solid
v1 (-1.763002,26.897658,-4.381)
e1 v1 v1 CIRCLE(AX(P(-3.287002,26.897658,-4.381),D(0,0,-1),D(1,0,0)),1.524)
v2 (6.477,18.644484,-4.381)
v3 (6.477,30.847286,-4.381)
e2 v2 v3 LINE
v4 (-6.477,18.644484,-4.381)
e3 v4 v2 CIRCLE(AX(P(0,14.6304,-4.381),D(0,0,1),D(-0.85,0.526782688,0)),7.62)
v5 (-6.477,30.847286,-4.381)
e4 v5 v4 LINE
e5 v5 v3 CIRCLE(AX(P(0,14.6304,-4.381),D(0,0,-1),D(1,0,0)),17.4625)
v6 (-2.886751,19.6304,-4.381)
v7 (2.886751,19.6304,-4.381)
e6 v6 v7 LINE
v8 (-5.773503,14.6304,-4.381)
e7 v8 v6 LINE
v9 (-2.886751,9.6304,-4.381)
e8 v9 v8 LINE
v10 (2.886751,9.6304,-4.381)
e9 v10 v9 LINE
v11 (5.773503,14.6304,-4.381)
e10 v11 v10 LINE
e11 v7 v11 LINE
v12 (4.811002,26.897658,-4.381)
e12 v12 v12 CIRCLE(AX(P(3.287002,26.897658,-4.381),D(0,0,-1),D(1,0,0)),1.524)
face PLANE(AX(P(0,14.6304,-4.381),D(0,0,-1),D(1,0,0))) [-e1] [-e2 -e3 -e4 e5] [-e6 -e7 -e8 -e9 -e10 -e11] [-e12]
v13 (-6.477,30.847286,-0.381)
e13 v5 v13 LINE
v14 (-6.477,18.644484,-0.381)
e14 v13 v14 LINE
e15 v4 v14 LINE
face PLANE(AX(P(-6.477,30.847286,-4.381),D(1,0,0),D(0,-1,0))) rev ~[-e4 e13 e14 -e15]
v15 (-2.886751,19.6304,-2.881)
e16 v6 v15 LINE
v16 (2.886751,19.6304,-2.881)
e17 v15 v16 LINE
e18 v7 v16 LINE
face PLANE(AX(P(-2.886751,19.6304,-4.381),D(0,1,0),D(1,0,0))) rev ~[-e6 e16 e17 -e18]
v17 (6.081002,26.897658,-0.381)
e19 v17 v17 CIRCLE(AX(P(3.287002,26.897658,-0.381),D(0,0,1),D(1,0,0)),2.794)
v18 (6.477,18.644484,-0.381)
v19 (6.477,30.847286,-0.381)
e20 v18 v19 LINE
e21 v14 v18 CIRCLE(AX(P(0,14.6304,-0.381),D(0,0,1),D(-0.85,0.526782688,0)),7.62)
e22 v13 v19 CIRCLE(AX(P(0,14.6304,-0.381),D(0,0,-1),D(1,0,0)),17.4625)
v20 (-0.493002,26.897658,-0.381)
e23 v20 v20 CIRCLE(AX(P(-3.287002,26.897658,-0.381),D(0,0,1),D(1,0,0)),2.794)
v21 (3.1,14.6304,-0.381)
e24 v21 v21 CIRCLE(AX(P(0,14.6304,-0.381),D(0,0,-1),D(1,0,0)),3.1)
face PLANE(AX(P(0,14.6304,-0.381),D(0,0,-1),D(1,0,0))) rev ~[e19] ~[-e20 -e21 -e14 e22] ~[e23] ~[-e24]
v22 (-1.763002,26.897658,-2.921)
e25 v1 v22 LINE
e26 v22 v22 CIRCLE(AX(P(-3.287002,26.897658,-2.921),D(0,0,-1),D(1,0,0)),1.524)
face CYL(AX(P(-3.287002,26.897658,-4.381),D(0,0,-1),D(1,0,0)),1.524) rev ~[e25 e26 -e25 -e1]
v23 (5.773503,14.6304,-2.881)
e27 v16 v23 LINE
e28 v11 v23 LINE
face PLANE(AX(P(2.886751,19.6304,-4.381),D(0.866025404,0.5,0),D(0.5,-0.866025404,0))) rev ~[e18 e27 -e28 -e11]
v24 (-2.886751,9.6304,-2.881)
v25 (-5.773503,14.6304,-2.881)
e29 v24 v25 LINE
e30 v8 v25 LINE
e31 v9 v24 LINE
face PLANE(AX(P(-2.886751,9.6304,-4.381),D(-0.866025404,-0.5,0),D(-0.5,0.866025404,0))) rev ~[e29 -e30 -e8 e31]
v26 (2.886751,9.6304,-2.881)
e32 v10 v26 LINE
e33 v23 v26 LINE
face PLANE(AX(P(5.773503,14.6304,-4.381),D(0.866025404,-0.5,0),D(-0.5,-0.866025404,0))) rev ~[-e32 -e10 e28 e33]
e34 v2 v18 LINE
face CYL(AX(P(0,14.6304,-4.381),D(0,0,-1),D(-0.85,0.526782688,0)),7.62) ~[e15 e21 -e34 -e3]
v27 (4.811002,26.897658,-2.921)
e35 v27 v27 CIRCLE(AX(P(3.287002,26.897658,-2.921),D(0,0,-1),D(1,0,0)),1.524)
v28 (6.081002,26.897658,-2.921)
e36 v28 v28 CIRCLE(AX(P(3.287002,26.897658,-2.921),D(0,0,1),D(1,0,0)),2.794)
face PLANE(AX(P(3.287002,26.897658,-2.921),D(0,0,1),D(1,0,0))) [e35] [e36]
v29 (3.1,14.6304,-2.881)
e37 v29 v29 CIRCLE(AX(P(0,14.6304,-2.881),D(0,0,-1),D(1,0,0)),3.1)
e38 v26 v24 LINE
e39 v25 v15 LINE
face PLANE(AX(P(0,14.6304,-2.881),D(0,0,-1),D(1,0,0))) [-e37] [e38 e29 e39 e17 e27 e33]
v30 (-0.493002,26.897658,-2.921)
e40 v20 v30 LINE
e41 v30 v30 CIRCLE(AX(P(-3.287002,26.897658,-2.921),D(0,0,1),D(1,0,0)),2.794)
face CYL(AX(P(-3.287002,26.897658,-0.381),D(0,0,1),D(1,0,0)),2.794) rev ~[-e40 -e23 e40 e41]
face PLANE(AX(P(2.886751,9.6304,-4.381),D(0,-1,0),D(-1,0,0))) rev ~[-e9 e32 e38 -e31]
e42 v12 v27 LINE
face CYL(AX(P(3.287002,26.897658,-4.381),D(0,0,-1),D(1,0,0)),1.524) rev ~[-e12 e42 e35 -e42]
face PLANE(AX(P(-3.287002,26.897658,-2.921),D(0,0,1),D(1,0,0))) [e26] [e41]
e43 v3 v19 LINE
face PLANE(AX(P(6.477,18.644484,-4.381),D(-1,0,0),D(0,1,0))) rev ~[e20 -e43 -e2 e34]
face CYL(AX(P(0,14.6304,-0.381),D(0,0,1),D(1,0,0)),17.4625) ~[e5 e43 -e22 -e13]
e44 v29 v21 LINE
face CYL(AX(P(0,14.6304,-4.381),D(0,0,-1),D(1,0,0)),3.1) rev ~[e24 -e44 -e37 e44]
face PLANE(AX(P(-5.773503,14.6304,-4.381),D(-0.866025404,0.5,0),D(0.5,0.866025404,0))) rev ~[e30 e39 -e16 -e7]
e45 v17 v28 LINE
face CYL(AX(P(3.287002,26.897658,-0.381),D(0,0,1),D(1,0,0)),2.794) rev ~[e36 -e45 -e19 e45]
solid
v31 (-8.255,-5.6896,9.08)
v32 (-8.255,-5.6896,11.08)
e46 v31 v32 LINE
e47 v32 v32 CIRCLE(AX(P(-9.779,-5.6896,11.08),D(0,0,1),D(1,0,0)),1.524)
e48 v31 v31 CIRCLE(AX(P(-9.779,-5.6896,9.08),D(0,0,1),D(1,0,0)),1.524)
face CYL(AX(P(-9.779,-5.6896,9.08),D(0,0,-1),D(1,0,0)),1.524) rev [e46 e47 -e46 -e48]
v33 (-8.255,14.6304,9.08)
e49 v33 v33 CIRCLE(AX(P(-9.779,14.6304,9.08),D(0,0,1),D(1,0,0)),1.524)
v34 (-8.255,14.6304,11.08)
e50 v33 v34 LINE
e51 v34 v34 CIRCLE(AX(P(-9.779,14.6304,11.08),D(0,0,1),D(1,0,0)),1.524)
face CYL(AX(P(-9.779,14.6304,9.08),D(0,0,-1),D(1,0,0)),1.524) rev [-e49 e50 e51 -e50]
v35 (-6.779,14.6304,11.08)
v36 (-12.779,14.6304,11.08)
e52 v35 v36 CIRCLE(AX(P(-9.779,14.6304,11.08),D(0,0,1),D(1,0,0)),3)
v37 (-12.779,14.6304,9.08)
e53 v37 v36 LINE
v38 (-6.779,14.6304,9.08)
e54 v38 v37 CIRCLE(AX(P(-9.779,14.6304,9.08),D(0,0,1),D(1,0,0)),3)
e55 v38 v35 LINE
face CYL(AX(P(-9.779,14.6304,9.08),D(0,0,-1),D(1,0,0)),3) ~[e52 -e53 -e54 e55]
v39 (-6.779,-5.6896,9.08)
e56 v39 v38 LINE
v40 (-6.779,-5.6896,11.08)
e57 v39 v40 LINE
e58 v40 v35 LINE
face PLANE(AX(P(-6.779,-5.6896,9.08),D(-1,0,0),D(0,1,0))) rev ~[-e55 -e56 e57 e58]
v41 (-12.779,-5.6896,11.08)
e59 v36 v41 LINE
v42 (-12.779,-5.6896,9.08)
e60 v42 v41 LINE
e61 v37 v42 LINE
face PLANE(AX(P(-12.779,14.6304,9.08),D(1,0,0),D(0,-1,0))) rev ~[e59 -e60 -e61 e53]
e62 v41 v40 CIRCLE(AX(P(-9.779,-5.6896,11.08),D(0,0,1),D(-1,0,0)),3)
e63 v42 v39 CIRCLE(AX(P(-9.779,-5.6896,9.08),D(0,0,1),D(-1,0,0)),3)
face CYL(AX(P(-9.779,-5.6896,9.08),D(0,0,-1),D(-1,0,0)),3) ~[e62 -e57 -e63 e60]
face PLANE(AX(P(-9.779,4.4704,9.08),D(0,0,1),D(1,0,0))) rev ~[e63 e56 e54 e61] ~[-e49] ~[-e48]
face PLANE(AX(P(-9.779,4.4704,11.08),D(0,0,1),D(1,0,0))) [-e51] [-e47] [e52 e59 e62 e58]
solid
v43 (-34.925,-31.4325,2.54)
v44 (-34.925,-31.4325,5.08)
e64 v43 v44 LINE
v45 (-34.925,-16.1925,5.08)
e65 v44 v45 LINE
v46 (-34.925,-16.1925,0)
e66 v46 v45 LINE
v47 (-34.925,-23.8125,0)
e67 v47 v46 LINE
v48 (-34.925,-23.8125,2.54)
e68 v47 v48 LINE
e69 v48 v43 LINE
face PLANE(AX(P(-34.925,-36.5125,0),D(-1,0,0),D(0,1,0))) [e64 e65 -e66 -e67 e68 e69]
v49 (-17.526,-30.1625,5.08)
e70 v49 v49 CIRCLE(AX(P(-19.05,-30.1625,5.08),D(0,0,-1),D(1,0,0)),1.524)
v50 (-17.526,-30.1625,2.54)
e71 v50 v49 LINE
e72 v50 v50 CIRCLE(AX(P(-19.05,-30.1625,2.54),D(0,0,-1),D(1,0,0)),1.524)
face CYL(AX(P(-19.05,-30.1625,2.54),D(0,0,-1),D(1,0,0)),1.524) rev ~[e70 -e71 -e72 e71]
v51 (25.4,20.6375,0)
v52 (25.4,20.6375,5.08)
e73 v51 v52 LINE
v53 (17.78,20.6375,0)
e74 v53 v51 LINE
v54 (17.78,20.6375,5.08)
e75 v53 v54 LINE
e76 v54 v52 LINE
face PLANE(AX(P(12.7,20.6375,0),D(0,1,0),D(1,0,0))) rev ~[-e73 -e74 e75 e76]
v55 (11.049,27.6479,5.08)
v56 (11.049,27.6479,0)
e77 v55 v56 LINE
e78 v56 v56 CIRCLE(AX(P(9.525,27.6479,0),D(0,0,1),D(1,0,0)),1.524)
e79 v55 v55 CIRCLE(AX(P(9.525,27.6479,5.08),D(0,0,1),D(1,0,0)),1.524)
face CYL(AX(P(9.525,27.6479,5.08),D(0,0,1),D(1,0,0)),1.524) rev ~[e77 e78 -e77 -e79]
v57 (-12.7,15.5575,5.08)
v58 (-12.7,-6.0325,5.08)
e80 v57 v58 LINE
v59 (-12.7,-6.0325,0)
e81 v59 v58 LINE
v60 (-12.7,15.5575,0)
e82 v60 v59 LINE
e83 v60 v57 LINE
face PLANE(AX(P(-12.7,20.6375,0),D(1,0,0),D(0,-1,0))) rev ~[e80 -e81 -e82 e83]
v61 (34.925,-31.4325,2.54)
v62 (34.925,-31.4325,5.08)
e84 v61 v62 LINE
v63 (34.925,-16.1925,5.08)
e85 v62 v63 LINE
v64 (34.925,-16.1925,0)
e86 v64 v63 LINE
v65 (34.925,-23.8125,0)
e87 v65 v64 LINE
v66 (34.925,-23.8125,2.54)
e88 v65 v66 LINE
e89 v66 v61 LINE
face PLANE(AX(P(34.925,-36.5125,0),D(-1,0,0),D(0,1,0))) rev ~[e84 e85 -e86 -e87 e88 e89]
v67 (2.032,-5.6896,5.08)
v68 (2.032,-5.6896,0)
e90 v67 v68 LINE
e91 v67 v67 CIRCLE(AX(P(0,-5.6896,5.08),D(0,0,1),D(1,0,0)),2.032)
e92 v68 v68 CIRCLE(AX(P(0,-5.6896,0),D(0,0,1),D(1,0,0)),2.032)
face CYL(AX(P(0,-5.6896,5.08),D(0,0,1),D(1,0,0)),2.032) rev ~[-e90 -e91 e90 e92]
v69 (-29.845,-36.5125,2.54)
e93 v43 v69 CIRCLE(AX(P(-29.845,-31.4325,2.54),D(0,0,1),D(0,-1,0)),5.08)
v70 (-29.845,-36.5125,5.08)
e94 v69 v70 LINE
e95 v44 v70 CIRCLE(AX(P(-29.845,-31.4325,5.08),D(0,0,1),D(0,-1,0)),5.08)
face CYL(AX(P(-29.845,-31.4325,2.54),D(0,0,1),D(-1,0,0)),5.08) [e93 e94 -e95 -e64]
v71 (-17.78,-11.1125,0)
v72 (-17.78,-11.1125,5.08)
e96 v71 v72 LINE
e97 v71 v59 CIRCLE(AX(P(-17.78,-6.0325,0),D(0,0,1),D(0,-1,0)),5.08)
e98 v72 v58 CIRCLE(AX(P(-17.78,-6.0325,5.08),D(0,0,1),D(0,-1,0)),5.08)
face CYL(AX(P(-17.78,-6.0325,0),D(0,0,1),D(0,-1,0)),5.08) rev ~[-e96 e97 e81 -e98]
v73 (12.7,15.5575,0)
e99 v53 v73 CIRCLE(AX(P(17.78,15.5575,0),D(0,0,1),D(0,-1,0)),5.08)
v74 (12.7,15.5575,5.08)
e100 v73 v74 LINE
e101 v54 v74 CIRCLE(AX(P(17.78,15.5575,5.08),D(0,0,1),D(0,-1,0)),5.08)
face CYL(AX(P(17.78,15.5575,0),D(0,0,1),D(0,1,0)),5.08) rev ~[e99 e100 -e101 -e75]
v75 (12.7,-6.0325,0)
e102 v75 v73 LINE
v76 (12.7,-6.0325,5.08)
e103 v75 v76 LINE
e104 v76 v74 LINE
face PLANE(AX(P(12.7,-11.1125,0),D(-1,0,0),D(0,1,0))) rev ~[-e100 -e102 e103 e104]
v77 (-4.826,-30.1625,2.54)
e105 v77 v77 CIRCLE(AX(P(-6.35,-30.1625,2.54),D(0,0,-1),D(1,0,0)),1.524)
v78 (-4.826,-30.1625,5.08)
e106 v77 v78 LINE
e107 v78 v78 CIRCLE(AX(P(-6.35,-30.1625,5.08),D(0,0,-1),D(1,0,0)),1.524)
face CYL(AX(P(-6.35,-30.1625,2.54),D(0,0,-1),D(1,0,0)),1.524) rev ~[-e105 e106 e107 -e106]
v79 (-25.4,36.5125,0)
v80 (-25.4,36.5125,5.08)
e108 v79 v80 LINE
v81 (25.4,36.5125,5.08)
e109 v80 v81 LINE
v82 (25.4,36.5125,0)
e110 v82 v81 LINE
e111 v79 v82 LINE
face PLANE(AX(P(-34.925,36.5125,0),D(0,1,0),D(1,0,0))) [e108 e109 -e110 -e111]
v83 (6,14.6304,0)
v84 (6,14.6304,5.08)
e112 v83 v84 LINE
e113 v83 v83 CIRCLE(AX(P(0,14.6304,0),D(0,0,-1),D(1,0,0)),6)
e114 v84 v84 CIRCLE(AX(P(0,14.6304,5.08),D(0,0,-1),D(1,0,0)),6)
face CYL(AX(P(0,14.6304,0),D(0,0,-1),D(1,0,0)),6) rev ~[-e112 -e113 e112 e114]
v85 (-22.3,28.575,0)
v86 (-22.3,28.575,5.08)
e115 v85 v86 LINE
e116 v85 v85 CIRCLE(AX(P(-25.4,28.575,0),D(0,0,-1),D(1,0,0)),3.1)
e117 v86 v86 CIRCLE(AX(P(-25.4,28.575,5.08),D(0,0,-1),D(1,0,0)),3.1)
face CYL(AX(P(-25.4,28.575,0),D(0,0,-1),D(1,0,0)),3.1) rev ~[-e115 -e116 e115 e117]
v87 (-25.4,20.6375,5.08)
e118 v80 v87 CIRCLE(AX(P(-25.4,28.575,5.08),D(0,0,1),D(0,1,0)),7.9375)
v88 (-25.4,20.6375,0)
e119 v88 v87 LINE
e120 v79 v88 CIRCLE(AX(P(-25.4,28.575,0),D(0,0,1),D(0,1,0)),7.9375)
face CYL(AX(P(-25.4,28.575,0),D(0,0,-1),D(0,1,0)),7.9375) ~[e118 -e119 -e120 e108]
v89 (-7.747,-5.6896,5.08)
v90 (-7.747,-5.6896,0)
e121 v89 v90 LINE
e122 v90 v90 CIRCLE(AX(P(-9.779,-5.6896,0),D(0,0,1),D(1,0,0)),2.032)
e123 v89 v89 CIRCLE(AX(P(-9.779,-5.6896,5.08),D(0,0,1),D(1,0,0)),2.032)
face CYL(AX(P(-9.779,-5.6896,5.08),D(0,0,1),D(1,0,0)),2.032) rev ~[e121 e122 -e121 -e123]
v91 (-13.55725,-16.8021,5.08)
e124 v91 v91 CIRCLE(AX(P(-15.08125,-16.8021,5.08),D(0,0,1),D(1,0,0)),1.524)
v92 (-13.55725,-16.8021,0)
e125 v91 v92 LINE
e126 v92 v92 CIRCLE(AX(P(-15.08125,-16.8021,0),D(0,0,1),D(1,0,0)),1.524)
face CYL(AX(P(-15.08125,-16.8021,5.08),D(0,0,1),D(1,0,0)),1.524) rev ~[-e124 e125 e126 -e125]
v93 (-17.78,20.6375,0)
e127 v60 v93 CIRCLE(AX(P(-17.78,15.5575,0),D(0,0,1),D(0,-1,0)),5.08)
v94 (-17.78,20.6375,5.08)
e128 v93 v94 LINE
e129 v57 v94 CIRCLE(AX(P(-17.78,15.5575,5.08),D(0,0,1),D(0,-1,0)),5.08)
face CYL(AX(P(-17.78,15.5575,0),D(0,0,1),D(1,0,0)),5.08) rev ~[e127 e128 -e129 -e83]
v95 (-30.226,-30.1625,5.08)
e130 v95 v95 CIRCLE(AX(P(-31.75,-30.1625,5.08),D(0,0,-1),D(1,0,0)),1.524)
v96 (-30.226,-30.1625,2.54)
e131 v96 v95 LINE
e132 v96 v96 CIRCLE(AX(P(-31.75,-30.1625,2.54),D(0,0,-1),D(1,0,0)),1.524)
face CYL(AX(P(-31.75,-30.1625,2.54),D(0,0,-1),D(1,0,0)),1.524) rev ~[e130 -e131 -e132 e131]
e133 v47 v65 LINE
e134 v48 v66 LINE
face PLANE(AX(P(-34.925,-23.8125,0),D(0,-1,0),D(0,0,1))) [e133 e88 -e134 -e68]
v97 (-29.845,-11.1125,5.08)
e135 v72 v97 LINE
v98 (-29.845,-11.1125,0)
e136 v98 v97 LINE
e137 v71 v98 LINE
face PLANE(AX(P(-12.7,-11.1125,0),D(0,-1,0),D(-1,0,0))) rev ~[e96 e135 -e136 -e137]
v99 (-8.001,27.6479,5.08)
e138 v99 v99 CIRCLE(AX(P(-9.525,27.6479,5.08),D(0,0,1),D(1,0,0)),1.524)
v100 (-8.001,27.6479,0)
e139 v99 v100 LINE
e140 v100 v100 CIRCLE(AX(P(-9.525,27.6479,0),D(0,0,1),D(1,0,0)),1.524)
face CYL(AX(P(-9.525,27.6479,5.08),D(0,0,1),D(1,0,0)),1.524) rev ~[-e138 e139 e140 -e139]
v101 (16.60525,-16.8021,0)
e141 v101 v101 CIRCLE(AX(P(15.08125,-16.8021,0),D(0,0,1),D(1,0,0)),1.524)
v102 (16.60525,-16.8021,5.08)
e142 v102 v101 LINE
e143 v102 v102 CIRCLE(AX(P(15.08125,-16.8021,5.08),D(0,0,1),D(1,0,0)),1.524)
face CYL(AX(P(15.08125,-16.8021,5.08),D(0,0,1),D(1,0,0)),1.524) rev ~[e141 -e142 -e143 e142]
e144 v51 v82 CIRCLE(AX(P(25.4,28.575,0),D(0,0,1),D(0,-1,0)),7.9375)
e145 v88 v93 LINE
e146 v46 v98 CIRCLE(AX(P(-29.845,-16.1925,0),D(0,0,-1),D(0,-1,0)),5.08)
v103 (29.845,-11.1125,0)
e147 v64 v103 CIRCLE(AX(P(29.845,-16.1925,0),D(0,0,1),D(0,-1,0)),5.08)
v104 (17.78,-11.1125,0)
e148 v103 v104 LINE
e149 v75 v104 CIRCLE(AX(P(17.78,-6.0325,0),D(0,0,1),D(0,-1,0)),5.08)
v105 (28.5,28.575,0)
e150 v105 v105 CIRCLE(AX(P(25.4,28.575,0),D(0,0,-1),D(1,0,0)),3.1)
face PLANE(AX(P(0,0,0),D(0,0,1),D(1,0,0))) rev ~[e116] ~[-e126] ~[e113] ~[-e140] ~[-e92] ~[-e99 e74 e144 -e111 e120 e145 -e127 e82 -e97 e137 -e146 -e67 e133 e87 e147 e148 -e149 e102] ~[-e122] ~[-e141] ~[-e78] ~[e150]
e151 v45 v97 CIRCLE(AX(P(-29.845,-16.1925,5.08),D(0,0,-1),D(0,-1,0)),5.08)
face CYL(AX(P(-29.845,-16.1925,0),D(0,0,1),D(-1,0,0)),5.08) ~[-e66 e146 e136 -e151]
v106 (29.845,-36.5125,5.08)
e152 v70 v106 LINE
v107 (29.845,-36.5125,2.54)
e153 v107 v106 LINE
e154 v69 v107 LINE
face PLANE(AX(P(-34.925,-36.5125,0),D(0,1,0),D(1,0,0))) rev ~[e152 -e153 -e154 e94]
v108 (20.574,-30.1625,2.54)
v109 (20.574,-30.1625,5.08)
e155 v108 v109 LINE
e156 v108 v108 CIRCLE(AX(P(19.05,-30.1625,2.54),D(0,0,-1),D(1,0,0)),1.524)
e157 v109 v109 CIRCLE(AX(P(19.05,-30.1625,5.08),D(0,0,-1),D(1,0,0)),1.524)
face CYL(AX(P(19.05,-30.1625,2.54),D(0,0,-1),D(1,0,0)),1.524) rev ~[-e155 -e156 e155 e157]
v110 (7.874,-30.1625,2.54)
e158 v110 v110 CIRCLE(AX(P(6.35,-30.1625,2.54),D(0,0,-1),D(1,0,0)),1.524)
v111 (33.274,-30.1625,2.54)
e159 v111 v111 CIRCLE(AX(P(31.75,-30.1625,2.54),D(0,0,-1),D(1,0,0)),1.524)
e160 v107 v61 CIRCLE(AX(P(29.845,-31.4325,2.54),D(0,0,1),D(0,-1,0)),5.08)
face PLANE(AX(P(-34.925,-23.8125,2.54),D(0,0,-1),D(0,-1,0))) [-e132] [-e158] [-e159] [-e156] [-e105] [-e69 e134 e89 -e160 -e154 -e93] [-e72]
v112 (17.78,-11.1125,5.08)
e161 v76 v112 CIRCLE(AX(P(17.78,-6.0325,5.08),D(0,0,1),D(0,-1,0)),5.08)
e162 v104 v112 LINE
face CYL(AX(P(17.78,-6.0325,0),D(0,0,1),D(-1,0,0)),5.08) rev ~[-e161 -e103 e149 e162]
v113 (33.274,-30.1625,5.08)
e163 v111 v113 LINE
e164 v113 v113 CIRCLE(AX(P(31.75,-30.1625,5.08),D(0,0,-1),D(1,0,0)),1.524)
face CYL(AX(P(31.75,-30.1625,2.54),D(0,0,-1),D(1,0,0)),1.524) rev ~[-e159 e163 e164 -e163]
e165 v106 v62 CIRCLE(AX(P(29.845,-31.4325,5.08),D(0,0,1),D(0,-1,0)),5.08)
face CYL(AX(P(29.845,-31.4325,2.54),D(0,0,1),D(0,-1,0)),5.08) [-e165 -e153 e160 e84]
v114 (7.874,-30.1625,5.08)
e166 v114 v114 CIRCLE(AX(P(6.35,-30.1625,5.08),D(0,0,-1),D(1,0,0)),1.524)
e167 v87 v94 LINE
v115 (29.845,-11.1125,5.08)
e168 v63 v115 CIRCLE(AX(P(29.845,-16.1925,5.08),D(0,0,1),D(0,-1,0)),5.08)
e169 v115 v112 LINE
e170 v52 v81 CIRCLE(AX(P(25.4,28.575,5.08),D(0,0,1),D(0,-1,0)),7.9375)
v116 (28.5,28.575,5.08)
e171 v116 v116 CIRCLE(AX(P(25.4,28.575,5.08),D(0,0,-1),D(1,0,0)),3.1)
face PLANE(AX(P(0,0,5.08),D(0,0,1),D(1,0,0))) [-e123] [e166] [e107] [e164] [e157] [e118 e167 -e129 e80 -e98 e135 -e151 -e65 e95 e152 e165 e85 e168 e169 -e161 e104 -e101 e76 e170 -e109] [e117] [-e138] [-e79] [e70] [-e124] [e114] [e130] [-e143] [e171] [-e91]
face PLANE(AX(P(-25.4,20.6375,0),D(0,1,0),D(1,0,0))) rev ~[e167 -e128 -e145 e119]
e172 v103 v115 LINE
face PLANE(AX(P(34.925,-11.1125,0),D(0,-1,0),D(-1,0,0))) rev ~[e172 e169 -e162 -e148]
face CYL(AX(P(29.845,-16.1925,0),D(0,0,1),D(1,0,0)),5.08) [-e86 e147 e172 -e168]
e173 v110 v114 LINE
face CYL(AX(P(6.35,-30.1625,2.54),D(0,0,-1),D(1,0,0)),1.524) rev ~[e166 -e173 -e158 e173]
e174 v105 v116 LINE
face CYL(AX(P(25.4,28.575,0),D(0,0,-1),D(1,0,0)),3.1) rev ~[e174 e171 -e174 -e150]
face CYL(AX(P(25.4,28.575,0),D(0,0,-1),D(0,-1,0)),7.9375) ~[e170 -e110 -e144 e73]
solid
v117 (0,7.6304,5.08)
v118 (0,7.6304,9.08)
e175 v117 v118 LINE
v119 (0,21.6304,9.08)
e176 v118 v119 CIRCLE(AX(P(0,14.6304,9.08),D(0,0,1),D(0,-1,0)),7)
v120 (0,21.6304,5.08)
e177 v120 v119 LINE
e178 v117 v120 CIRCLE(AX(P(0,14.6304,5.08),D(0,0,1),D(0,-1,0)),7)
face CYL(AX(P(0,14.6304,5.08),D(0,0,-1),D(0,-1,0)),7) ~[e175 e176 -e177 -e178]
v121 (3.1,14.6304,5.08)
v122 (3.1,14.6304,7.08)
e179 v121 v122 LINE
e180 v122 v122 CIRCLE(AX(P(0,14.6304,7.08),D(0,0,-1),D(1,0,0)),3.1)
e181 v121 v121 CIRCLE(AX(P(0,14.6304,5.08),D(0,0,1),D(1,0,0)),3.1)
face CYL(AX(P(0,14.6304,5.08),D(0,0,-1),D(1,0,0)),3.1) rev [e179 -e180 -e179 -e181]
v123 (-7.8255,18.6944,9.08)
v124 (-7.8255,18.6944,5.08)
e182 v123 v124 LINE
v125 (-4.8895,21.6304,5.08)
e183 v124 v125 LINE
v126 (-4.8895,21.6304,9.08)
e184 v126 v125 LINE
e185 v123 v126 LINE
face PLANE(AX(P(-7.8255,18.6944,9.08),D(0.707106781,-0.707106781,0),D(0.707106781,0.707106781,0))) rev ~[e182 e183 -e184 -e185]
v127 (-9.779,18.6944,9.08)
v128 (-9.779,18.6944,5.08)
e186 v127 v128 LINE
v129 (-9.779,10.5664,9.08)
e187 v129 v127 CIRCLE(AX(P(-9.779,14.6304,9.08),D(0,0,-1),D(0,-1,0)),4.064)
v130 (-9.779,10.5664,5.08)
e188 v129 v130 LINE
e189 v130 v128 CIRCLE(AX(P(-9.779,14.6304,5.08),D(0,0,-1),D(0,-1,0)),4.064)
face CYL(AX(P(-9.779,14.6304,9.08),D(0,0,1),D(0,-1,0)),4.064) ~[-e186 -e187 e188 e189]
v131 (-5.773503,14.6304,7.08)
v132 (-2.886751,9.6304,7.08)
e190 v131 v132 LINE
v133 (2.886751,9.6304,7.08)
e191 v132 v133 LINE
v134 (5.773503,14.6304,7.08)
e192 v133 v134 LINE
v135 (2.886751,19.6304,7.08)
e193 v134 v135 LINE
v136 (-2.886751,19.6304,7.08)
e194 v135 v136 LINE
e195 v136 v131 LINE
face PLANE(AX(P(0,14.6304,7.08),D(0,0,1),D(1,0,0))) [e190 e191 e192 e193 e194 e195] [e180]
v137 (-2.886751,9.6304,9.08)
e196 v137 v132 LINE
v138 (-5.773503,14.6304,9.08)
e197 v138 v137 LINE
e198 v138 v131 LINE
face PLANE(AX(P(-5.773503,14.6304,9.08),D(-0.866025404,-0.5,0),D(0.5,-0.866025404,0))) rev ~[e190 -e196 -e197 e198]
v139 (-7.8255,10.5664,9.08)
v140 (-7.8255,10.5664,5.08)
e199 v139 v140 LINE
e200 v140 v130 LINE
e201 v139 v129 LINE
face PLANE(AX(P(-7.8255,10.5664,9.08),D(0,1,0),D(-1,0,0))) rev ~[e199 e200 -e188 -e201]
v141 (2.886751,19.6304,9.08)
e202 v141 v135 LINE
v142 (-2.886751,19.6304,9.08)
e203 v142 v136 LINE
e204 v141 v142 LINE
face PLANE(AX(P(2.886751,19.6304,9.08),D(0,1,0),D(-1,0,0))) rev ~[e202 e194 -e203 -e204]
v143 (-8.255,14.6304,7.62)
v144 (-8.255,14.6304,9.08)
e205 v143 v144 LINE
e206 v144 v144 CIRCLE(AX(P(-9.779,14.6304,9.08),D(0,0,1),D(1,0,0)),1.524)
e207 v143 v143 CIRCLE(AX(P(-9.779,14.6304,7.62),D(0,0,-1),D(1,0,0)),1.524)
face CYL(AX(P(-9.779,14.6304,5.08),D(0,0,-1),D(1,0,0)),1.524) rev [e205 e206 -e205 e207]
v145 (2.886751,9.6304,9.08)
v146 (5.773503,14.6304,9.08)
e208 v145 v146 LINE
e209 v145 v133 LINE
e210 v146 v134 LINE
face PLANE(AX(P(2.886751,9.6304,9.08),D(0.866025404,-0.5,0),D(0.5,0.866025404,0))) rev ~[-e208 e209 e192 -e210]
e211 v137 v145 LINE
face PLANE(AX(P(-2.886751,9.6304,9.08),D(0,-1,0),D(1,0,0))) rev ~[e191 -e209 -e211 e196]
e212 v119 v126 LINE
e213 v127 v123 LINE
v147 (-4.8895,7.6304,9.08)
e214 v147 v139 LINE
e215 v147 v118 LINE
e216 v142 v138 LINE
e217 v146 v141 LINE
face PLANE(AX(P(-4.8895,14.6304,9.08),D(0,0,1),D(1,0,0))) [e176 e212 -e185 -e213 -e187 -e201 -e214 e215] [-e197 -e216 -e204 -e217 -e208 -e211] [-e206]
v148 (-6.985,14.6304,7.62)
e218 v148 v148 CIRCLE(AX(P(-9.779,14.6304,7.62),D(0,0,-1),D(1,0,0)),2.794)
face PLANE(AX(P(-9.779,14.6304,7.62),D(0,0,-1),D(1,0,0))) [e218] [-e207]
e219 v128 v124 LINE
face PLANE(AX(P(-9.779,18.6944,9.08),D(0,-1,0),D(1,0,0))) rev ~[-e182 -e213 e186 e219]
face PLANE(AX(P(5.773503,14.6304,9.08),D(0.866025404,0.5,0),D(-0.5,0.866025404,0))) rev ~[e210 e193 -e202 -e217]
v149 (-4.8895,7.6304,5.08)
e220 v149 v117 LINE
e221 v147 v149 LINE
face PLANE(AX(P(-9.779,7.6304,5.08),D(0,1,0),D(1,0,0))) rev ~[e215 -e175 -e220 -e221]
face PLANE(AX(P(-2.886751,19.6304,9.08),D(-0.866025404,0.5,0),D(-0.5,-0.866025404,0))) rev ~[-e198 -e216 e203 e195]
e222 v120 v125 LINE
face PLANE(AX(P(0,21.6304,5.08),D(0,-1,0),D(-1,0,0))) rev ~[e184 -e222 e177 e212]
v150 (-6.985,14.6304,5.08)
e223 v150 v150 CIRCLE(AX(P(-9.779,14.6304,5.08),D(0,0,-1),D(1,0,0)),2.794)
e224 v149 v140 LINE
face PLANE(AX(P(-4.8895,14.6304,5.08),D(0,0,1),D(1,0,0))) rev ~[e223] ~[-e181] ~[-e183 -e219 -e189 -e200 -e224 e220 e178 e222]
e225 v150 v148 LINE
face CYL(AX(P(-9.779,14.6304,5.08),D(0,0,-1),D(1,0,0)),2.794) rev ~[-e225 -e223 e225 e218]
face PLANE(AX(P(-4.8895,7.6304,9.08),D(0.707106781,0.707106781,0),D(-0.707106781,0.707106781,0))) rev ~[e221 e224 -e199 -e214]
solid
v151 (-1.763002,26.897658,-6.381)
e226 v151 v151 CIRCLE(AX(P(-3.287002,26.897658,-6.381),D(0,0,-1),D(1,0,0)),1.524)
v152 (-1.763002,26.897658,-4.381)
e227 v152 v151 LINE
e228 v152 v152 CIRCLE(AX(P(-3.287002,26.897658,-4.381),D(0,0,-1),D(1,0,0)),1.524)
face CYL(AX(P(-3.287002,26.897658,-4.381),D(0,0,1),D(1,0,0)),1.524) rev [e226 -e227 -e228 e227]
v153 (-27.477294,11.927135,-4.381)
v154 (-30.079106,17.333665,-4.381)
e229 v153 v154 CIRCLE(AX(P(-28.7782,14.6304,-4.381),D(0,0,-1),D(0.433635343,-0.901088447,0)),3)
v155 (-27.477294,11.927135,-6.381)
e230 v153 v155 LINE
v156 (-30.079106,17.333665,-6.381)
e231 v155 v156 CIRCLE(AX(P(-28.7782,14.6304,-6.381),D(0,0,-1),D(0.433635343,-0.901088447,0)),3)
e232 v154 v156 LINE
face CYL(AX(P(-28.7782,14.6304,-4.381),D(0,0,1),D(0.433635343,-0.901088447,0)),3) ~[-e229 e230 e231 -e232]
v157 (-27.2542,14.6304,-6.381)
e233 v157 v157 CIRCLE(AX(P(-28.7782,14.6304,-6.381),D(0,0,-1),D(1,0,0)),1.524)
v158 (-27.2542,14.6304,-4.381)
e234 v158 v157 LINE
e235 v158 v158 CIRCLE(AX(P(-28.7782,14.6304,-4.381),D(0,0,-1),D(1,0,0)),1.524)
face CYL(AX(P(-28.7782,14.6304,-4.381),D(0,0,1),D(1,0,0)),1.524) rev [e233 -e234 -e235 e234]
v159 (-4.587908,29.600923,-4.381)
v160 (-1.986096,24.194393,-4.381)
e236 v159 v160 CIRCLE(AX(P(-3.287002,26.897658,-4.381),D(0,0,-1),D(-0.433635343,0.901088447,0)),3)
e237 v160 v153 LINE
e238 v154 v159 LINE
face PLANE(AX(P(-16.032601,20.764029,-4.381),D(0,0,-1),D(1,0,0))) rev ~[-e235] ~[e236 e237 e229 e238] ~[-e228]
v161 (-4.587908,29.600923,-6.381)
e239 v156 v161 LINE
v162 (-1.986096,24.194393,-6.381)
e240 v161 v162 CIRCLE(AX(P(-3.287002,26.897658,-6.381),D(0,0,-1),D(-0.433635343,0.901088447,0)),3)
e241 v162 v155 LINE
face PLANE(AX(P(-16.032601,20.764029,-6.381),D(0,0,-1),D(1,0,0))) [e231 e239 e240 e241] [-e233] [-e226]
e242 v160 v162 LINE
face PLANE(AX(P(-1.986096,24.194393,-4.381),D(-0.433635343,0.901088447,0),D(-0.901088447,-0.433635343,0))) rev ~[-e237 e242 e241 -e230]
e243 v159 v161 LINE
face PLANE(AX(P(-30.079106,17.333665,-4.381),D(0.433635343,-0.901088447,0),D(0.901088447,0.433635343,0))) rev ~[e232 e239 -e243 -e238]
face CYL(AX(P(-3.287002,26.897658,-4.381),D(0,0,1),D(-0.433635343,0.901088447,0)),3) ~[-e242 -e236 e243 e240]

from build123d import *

# Parameters (mm, degrees)
F0_W      = 69.85
F0_H      = 73.025
F1_DEPTH  = 5.08
F2_W      = 12.7
F2_H      = 2.54
F3_DEPTH  = 69.851
F4_R      = 3.1
F4_R_2    = 6
F5_DEPTH  = 5.08
F6_R      = 5.08
F8_R      = 17.4625
F9_DEPTH  = 4
F10_R     = 3.1
F11_DEPTH = 25.4
F12_R     = 3.1
F14_DEPTH = 1.5
F15_R     = 1.524
F16_DEPTH = 4
F18_DEPTH = 4
F19_R     = 1.524
F20_DEPTH = 2
F13_R     = 1.524
F21_DEPTH = 2.54
F22_R     = 1.524
F22_R_2   = 3.1
F23_DEPTH = 4
F25_DEPTH = 2
F27_DEPTH = 4
F28_R     = 2.032
F29_DEPTH = 5.08
F30_R     = 1.524
F31_DEPTH = 5.08
F32_R     = 2.794
F33_DEPTH = 2.54
F34_R     = 2.794
F35_DEPTH = 2.54
F36_R     = 1.524
F37_DEPTH = 2


# Not quite as in the source:
# - a feature names something its author has since deleted; it is built from what else it names


with BuildPart() as f1:
    # F0 (on Top) → F1 (new body)
    with BuildSketch(Plane.XY):
        Rectangle(F0_W, F0_H)
    extrude(amount=F1_DEPTH)

    # F2 (on face) → F3 (cut, through all)
    with BuildSketch(Plane(origin=(-34.925, 0, 0), x_dir=(0, -1, 0), z_dir=(-1, 0, 0))):
        with Locations((30.1625, 1.27)):
            Rectangle(F2_W, F2_H)
    extrude(amount=-F3_DEPTH, mode=Mode.SUBTRACT)

    # F4 (on face) → F5 (cut, through all)
    with BuildSketch(Plane(origin=(0, 0, 0), x_dir=(1, 0, 0), z_dir=(0, 0, -1))):
        with Locations((-25.4, -28.575)):
            Circle(F4_R)
        with Locations((0, -14.6304)):
            Circle(F4_R_2)
        with Locations((25.4, -28.575)):
            Circle(F4_R)
        with BuildLine():
            Line((-34.925, -36.5125), (-25.4, -36.5125))
            ThreePointArc((-25.4, -36.5125), (-33.3375, -28.575), (-25.4, -20.6375))
            Line((-25.4, -20.6375), (-12.7, -20.6375))
            Line((-12.7, -20.6375), (-12.7, 11.1125))
            Line((-12.7, 11.1125), (-34.925, 11.1125))
            Line((-34.925, 11.1125), (-34.925, -36.5125))
        make_face()
        with BuildLine():
            ThreePointArc((25.4, -20.6375), (33.3375, -28.575), (25.4, -36.5125))
            Line((25.4, -36.5125), (34.925, -36.5125))
            Line((34.925, -36.5125), (34.925, 11.1125))
            Line((34.925, 11.1125), (12.7, 11.1125))
            Line((12.7, 11.1125), (12.7, -20.6375))
            Line((12.7, -20.6375), (25.4, -20.6375))
        make_face()
    extrude(amount=-F5_DEPTH, mode=Mode.SUBTRACT)

    # F6
    f6_edges = [f1.edges().sort_by_distance(p)[0] for p in [
        (-12.7, 20.6375, 2.54),
        (12.7, 20.6375, 2.54),
        (12.7, -11.1125, 2.54),
        (-12.7, -11.1125, 2.54),
        (34.925, -11.1125, 2.54),
        (-34.925, -11.1125, 2.54),
        (-34.925, -36.5125, 3.81),
        (34.925, -36.5125, 3.81),
    ]]
    fillet(f6_edges, radius=F6_R)

    # F13 (on face) → F21 (cut, through all)
    with BuildSketch(Plane(origin=(0, 0, 2.54), x_dir=(1, 0, 0), z_dir=(0, 0, -1))):
        with Locations((-31.75, 30.1625)):
            Circle(F13_R)
        with Locations((-19.05, 30.1625)):
            Circle(F13_R)
        with Locations((-6.35, 30.1625)):
            Circle(F13_R)
        with Locations((6.35, 30.1625)):
            Circle(F13_R)
        with Locations((19.05, 30.1625)):
            Circle(F13_R)
        with Locations((31.75, 30.1625)):
            Circle(F13_R)
    extrude(amount=-F21_DEPTH, mode=Mode.SUBTRACT)

    # F28 (on face) → F29 (cut, through all)
    with BuildSketch(Plane.XY.offset(5.08)):
        with Locations((0, -5.6896)):
            Circle(F28_R)
        with Locations((-9.779, -5.6896)):
            Circle(F28_R)
    extrude(amount=-F29_DEPTH, mode=Mode.SUBTRACT)

    # F30 (on face) → F31 (cut, through all)
    with BuildSketch(Plane.XY.offset(5.08)):
        with Locations((15.08125, -16.8021)):
            Circle(F30_R)
        with Locations((-15.08125, -16.8021)):
            Circle(F30_R)
        with Locations((-9.525, 27.6479)):
            Circle(F30_R)
        with Locations((9.525, 27.6479)):
            Circle(F30_R)
    extrude(amount=-F31_DEPTH, mode=Mode.SUBTRACT)


with BuildPart() as f9:
    # F8 (on offset) → F9 (new body)
    with BuildSketch(Plane(origin=(0, 0, -0.381), x_dir=(1, 0, 0), z_dir=(0, 0, -1))):
        with Locations((0, -14.6304)):
            Circle(F8_R)
    extrude(amount=F9_DEPTH)

    # F10 (on face) → F11 (cut)
    with BuildSketch(Plane(origin=(0, 0, -4.381), x_dir=(1, 0, 0), z_dir=(0, 0, -1))):
        with Locations((0, -14.6304)):
            Circle(F10_R)
    extrude(amount=-F11_DEPTH, mode=Mode.SUBTRACT)

    # F12 (on face) → F14 (cut)
    with BuildSketch(Plane(origin=(0, 0, -4.381), x_dir=(1, 0, 0), z_dir=(0, 0, -1))):
        Polygon((5.7735026919, -14.6304), (2.8867513459, -9.6304), (-2.8867513459, -9.6304), (-5.7735026919, -14.6304), (-2.8867513459, -19.6304), (2.8867513459, -19.6304), align=None)
        with Locations((0, -14.6304)):
            Circle(F12_R, mode=Mode.SUBTRACT)
    extrude(amount=-F14_DEPTH, mode=Mode.SUBTRACT)

    # F15 (on face) → F16 (cut, through all)
    with BuildSketch(Plane(origin=(0, 0, -4.381), x_dir=(1, 0, 0), z_dir=(0, 0, -1))):
        with Locations((-3.2870018728, -26.8976579939)):
            Circle(F15_R)
        with Locations((3.2870018728, -26.8976579939)):
            Circle(F15_R)
    extrude(amount=-F16_DEPTH, mode=Mode.SUBTRACT)

    # F17 (on face) → F18 (cut, through all)
    with BuildSketch(Plane(origin=(0, 0, -4.381), x_dir=(1, 0, 0), z_dir=(0, 0, -1))):
        with BuildLine():
            Line((-6.477, -30.8472855595), (-6.477, -18.6444840798))
            ThreePointArc((-6.477, -18.6444840798), (0, -7.0104), (6.477, -18.6444840798))
            Line((6.477, -18.6444840798), (6.477, -30.8472855595))
            ThreePointArc((6.477, -30.8472855595), (14.4575848389, -24.4241299776), (17.4625, -14.6304))
            ThreePointArc((17.4625, -14.6304), (-9.7937299776, -0.1728151611), (-6.477, -30.8472855595))
        make_face()
    extrude(amount=-F18_DEPTH, mode=Mode.SUBTRACT)

    # F34 (on face) → F35 (cut)
    with BuildSketch(Plane.XY.offset(-0.381)):
        with Locations((-3.2870018728, 26.8976579939)):
            Circle(F34_R)
        with Locations((3.2870018728, 26.8976579939)):
            Circle(F34_R)
    extrude(amount=-F35_DEPTH, mode=Mode.SUBTRACT)


with BuildPart() as f20:
    # F19 (on face) → F20 (new body)
    with BuildSketch(Plane(origin=(0, 0, -4.381), x_dir=(1, 0, 0), z_dir=(0, 0, -1))):
        with BuildLine():
            ThreePointArc((-27.4772939699, -11.9271346595), (-31.4814653405, -13.3294939699), (-30.0791060301, -17.3336653405))
            Line((-30.0791060301, -17.3336653405), (-4.5879079029, -29.6009233343))
            ThreePointArc((-4.5879079029, -29.6009233343), (-0.5837365323, -28.1985640239), (-1.9860958427, -24.1943926534))
            Line((-1.9860958427, -24.1943926534), (-27.4772939699, -11.9271346595))
        make_face()
        with Locations((-3.2870018728, -26.8976579939)):
            Circle(F19_R, mode=Mode.SUBTRACT)
        with Locations((-28.7782, -14.6304)):
            Circle(F19_R, mode=Mode.SUBTRACT)
    extrude(amount=F20_DEPTH)


with BuildPart() as f23:
    # F22 (on face) → F23 (new body)
    with BuildSketch(Plane.XY.offset(5.08)):
        with BuildLine():
            Line((0, 21.6304), (-9.779, 21.6304))
            ThreePointArc((-9.779, 21.6304), (-16.779, 14.6304), (-9.779, 7.6304))
            Line((-9.779, 7.6304), (0, 7.6304))
            ThreePointArc((0, 7.6304), (7, 14.6304), (0, 21.6304))
        make_face()
        with Locations((-9.779, 14.6304)):
            Circle(F22_R, mode=Mode.SUBTRACT)
        with Locations((0, 14.6304)):
            Circle(F22_R_2, mode=Mode.SUBTRACT)
    extrude(amount=F23_DEPTH)

    # F24 (on face) → F25 (cut)
    with BuildSketch(Plane.XY.offset(9.08)):
        Polygon((2.8867513459, 19.6304), (-2.8867513459, 19.6304), (-5.7735026919, 14.6304), (-2.8867513459, 9.6304), (2.8867513459, 9.6304), (5.7735026919, 14.6304), align=None)
    extrude(amount=-F25_DEPTH, mode=Mode.SUBTRACT)

    # F26 (on face) → F27 (cut, through all)
    with BuildSketch(Plane.XY.offset(9.08)):
        with BuildLine():
            Line((-7.8255, 10.5664), (-9.779, 10.5664))
            ThreePointArc((-9.779, 10.5664), (-13.843, 14.6304), (-9.779, 18.6944))
            Line((-9.779, 18.6944), (-7.8255, 18.6944))
            Line((-7.8255, 18.6944), (-4.8895, 21.6304))
            Line((-4.8895, 21.6304), (-9.779, 21.6304))
            ThreePointArc((-9.779, 21.6304), (-16.779, 14.6304), (-9.779, 7.6304))
            Line((-9.779, 7.6304), (-4.8895, 7.6304))
            Line((-4.8895, 7.6304), (-7.8255, 10.5664))
        make_face()
    extrude(amount=-F27_DEPTH, mode=Mode.SUBTRACT)

    # F32 (on face) → F33 (cut)
    with BuildSketch(Plane(origin=(0, 0, 5.08), x_dir=(1, 0, 0), z_dir=(0, 0, -1))):
        with Locations((-9.779, -14.6304)):
            Circle(F32_R)
    extrude(amount=-F33_DEPTH, mode=Mode.SUBTRACT)


with BuildPart() as f37:
    # F36 (on face) → F37 (new body)
    with BuildSketch(Plane.XY.offset(9.08)):
        with BuildLine():
            Line((-6.779, -5.6896), (-6.779, 14.6304))
            ThreePointArc((-6.779, 14.6304), (-9.779, 17.6304), (-12.779, 14.6304))
            Line((-12.779, 14.6304), (-12.779, -5.6896))
            ThreePointArc((-12.779, -5.6896), (-9.779, -8.6896), (-6.779, -5.6896))
        make_face()
        with Locations((-9.779, -5.6896)):
            Circle(F36_R, mode=Mode.SUBTRACT)
        with Locations((-9.779, 14.6304)):
            Circle(F36_R, mode=Mode.SUBTRACT)
    extrude(amount=F37_DEPTH)


solid = Compound([f1.part, f9.part, f20.part, f23.part, f37.part])
